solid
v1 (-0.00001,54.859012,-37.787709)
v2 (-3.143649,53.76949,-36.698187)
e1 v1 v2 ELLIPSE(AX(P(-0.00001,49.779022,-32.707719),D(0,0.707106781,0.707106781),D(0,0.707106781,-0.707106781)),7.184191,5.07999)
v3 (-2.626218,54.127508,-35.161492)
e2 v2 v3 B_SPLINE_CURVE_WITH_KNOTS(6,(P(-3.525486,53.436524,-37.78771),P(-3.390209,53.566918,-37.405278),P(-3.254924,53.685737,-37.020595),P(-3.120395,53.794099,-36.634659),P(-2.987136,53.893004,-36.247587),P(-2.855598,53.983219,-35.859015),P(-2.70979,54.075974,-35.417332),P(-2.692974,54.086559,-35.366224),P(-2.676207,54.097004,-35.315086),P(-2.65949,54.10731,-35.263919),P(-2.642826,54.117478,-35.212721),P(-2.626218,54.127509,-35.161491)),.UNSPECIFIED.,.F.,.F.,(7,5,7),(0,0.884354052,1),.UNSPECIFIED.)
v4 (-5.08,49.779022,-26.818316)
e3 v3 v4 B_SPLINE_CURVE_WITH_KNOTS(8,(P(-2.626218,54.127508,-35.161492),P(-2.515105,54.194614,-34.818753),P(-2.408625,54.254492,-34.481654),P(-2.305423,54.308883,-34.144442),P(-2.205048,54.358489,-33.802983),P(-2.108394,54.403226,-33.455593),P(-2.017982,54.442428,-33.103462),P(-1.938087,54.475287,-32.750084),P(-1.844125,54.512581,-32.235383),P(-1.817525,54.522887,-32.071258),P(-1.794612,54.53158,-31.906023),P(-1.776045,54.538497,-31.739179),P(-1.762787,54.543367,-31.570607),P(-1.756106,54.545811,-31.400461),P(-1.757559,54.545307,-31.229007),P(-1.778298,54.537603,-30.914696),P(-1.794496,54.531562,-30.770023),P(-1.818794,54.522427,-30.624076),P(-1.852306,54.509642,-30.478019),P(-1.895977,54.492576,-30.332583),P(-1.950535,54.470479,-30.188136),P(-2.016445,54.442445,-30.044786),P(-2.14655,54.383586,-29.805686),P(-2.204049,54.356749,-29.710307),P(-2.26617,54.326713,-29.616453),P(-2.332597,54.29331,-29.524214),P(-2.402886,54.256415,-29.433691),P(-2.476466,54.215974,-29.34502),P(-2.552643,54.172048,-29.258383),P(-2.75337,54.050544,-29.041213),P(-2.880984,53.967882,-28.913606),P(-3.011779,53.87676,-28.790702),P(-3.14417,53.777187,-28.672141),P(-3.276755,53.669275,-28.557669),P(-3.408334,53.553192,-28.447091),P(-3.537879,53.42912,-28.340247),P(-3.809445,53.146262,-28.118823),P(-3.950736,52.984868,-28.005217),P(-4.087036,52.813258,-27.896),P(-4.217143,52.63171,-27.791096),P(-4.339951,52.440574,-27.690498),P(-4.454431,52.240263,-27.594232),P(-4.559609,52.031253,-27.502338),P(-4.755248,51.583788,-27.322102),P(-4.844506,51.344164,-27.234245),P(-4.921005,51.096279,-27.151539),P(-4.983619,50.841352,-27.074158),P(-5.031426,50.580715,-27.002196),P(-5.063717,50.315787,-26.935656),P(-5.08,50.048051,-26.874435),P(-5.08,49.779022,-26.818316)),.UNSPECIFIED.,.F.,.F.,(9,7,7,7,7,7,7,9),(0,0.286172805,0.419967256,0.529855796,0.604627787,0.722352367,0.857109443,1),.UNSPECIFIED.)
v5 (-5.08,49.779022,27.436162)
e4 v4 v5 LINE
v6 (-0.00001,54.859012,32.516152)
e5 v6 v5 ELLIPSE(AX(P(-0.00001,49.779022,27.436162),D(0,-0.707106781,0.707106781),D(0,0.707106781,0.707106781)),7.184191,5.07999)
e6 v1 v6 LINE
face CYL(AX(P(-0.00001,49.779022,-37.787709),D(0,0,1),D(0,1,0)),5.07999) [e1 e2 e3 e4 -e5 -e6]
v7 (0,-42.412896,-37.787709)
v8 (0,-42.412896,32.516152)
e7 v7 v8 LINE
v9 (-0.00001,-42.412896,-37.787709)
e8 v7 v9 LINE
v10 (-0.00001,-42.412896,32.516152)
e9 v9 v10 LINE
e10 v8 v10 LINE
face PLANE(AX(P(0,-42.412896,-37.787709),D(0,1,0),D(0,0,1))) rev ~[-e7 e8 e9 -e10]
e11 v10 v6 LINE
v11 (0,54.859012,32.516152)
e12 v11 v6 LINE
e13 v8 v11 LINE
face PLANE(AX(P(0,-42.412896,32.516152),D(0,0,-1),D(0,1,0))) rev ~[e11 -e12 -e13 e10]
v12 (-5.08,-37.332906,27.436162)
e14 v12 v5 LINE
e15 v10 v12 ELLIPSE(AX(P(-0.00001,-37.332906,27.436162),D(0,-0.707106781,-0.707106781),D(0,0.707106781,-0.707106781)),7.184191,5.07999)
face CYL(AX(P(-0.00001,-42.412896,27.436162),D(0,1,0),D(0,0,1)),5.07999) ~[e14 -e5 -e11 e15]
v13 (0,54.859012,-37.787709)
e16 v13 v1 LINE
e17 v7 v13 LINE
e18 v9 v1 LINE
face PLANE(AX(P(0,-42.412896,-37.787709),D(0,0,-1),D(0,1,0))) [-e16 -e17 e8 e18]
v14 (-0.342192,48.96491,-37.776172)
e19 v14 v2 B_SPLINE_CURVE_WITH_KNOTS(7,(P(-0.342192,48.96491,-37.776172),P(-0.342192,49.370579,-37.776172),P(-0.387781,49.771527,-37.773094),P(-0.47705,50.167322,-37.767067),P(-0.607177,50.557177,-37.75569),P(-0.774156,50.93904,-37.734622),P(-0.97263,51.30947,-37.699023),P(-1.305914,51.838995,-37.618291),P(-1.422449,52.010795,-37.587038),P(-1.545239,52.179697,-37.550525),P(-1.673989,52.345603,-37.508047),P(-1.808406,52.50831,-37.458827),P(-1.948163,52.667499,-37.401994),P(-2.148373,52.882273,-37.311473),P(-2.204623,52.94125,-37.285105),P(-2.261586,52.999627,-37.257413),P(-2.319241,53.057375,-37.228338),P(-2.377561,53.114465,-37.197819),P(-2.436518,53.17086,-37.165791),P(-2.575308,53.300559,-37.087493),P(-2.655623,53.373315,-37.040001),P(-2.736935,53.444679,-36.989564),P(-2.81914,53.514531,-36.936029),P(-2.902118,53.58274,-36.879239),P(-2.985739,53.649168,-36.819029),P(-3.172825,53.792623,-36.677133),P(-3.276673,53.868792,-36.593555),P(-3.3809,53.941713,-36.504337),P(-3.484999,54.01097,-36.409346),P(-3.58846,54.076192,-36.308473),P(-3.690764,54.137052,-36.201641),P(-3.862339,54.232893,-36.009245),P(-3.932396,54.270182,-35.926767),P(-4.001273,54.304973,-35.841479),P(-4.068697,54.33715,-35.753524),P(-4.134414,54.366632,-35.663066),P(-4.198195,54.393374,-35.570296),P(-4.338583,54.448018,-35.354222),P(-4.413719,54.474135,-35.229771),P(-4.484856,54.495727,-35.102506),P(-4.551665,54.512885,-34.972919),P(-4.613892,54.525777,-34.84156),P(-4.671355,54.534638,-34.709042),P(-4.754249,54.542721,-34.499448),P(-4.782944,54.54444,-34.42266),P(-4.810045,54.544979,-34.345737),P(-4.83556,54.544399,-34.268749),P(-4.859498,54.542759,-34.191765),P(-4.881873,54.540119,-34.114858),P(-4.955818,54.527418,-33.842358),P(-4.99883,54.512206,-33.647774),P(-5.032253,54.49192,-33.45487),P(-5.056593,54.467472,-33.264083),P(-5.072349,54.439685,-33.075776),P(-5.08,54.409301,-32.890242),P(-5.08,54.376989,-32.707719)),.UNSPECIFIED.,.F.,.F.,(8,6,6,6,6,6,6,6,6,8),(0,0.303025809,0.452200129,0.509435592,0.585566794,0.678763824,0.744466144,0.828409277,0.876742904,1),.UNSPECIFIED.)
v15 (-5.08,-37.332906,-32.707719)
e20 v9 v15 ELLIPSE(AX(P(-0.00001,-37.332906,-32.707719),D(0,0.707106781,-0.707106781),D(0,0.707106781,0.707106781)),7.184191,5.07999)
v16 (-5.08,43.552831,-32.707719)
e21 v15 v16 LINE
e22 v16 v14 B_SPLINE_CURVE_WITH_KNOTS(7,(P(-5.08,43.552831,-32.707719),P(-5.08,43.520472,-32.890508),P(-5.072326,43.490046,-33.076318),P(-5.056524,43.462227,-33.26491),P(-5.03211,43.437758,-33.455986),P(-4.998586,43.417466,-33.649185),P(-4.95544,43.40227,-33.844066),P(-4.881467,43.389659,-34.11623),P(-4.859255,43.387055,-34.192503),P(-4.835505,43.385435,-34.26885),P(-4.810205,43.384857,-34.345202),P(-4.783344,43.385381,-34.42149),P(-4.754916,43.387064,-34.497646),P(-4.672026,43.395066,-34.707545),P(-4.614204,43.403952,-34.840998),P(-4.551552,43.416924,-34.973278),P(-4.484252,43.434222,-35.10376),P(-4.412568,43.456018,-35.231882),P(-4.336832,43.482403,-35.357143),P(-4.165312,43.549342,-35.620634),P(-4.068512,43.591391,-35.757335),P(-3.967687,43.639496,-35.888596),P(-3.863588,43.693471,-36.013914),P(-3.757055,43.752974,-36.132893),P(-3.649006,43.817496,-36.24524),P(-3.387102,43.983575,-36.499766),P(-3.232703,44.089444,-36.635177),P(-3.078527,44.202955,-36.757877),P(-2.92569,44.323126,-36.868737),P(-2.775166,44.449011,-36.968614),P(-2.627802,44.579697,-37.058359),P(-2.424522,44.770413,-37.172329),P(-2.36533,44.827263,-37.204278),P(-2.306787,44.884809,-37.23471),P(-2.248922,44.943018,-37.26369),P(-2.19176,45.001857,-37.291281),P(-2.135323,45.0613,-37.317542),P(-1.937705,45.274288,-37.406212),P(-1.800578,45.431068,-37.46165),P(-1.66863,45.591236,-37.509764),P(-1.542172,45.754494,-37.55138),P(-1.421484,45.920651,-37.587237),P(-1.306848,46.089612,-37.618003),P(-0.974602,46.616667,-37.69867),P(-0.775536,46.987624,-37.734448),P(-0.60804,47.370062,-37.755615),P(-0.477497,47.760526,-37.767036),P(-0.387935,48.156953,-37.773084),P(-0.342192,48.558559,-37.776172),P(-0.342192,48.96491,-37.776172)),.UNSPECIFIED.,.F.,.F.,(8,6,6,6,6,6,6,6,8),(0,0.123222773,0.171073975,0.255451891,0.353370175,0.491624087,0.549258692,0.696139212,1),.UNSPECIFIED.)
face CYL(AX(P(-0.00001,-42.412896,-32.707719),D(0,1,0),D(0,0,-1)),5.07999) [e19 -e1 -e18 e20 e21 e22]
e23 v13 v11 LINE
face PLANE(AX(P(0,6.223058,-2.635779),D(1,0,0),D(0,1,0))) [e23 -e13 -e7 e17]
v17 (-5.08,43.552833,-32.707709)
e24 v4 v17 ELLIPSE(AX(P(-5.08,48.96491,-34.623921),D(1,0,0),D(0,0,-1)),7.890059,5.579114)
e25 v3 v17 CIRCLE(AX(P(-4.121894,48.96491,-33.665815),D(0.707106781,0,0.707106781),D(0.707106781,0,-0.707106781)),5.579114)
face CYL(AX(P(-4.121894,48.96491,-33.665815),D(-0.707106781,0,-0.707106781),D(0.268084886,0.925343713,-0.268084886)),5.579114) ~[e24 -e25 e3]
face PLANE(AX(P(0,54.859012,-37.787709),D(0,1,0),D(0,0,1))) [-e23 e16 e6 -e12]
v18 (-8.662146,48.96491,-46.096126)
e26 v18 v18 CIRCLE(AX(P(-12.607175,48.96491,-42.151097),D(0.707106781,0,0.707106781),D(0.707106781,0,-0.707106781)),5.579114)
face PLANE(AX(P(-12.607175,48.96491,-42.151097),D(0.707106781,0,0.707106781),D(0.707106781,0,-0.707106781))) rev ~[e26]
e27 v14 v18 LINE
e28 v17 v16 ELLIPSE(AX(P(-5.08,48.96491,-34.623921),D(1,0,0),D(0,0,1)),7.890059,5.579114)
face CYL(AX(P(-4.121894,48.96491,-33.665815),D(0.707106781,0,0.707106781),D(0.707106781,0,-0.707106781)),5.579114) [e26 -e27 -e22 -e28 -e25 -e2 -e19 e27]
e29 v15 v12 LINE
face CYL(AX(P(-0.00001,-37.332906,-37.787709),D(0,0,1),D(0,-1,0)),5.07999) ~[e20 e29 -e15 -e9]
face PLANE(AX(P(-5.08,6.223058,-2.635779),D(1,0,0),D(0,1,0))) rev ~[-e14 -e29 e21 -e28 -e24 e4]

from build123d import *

# Parameters (mm, degrees)
F0_W     = 97.2719080746
F0_H     = 70.3038610518
F1_DEPTH = 5.08
F2_R     = 5.07999
F4_R     = 5.5791141454
F5_DEPTH = 12


# Not quite as in the source:
# - a fillet or chamfer is up to 0.001 mm smaller than in the source, because OpenCascade refuses the exact size


with BuildPart() as f1:
    # F0 (on Right) → F1 (new body)
    with BuildSketch(Plane.YZ):
        with Locations((6.223058328, -2.6357788593)):
            Rectangle(F0_W, F0_H)
    extrude(amount=-F1_DEPTH)

    # F2 (radius 5.08 in the source; OpenCascade refuses exactly that, so slightly less here)
    f2_edges = [f1.edges().sort_by_distance(p)[0] for p in [
        (-5.08, 6.223058, 32.516152),
        (-5.08, -42.412896, -2.635779),
        (-5.08, 6.223058, -37.787709),
        (-5.08, 54.859012, -2.635779),
    ]]
    fillet(f2_edges, radius=F2_R)

    # F4 (on line) → F5 (join)
    with BuildSketch(Plane(origin=(-18.8938546926, 0, -18.8938546926), x_dir=(0.7071067812, 0, -0.7071067812), z_dir=(0.7071067812, 0, 0.7071067812))):
        with Locations((20.8907071501, 48.9649102092)):
            Circle(F4_R)
    extrude(amount=-F5_DEPTH)

    # F5_face (on face) → F6 (join, up to the last surface of F1)
    with BuildSketch(Plane(origin=(-6.0444772331, 49.5744646738, -31.743232152), x_dir=(0.7071067812, 0, -0.7071067812), z_dir=(0.7071067812, 0, 0.7071067812))):
        with BuildLine():
            add(Edge.make_bspline(
                [(4.8341488182, 4.5530437353), (1.3639767837, 3.0711160289), (1.3639767837, 0.2045576915)],
                knots=[5.255697667, 5.255697667, 5.255697667, 6.2831853072, 6.2831853072, 6.2831853072], degree=2, weights=[1, 0.8709107479, 1]))
            ThreePointArc((4.8341488182, 4.5530437353), (-2.582040706, 1.1300096876), (1.3639767837, -6.021631741))
            Line((1.3639767837, -6.021631741), (1.3639767837, 0.2045576915))
        make_face()
    extrude(until=Until.LAST)


solid = f1.part
